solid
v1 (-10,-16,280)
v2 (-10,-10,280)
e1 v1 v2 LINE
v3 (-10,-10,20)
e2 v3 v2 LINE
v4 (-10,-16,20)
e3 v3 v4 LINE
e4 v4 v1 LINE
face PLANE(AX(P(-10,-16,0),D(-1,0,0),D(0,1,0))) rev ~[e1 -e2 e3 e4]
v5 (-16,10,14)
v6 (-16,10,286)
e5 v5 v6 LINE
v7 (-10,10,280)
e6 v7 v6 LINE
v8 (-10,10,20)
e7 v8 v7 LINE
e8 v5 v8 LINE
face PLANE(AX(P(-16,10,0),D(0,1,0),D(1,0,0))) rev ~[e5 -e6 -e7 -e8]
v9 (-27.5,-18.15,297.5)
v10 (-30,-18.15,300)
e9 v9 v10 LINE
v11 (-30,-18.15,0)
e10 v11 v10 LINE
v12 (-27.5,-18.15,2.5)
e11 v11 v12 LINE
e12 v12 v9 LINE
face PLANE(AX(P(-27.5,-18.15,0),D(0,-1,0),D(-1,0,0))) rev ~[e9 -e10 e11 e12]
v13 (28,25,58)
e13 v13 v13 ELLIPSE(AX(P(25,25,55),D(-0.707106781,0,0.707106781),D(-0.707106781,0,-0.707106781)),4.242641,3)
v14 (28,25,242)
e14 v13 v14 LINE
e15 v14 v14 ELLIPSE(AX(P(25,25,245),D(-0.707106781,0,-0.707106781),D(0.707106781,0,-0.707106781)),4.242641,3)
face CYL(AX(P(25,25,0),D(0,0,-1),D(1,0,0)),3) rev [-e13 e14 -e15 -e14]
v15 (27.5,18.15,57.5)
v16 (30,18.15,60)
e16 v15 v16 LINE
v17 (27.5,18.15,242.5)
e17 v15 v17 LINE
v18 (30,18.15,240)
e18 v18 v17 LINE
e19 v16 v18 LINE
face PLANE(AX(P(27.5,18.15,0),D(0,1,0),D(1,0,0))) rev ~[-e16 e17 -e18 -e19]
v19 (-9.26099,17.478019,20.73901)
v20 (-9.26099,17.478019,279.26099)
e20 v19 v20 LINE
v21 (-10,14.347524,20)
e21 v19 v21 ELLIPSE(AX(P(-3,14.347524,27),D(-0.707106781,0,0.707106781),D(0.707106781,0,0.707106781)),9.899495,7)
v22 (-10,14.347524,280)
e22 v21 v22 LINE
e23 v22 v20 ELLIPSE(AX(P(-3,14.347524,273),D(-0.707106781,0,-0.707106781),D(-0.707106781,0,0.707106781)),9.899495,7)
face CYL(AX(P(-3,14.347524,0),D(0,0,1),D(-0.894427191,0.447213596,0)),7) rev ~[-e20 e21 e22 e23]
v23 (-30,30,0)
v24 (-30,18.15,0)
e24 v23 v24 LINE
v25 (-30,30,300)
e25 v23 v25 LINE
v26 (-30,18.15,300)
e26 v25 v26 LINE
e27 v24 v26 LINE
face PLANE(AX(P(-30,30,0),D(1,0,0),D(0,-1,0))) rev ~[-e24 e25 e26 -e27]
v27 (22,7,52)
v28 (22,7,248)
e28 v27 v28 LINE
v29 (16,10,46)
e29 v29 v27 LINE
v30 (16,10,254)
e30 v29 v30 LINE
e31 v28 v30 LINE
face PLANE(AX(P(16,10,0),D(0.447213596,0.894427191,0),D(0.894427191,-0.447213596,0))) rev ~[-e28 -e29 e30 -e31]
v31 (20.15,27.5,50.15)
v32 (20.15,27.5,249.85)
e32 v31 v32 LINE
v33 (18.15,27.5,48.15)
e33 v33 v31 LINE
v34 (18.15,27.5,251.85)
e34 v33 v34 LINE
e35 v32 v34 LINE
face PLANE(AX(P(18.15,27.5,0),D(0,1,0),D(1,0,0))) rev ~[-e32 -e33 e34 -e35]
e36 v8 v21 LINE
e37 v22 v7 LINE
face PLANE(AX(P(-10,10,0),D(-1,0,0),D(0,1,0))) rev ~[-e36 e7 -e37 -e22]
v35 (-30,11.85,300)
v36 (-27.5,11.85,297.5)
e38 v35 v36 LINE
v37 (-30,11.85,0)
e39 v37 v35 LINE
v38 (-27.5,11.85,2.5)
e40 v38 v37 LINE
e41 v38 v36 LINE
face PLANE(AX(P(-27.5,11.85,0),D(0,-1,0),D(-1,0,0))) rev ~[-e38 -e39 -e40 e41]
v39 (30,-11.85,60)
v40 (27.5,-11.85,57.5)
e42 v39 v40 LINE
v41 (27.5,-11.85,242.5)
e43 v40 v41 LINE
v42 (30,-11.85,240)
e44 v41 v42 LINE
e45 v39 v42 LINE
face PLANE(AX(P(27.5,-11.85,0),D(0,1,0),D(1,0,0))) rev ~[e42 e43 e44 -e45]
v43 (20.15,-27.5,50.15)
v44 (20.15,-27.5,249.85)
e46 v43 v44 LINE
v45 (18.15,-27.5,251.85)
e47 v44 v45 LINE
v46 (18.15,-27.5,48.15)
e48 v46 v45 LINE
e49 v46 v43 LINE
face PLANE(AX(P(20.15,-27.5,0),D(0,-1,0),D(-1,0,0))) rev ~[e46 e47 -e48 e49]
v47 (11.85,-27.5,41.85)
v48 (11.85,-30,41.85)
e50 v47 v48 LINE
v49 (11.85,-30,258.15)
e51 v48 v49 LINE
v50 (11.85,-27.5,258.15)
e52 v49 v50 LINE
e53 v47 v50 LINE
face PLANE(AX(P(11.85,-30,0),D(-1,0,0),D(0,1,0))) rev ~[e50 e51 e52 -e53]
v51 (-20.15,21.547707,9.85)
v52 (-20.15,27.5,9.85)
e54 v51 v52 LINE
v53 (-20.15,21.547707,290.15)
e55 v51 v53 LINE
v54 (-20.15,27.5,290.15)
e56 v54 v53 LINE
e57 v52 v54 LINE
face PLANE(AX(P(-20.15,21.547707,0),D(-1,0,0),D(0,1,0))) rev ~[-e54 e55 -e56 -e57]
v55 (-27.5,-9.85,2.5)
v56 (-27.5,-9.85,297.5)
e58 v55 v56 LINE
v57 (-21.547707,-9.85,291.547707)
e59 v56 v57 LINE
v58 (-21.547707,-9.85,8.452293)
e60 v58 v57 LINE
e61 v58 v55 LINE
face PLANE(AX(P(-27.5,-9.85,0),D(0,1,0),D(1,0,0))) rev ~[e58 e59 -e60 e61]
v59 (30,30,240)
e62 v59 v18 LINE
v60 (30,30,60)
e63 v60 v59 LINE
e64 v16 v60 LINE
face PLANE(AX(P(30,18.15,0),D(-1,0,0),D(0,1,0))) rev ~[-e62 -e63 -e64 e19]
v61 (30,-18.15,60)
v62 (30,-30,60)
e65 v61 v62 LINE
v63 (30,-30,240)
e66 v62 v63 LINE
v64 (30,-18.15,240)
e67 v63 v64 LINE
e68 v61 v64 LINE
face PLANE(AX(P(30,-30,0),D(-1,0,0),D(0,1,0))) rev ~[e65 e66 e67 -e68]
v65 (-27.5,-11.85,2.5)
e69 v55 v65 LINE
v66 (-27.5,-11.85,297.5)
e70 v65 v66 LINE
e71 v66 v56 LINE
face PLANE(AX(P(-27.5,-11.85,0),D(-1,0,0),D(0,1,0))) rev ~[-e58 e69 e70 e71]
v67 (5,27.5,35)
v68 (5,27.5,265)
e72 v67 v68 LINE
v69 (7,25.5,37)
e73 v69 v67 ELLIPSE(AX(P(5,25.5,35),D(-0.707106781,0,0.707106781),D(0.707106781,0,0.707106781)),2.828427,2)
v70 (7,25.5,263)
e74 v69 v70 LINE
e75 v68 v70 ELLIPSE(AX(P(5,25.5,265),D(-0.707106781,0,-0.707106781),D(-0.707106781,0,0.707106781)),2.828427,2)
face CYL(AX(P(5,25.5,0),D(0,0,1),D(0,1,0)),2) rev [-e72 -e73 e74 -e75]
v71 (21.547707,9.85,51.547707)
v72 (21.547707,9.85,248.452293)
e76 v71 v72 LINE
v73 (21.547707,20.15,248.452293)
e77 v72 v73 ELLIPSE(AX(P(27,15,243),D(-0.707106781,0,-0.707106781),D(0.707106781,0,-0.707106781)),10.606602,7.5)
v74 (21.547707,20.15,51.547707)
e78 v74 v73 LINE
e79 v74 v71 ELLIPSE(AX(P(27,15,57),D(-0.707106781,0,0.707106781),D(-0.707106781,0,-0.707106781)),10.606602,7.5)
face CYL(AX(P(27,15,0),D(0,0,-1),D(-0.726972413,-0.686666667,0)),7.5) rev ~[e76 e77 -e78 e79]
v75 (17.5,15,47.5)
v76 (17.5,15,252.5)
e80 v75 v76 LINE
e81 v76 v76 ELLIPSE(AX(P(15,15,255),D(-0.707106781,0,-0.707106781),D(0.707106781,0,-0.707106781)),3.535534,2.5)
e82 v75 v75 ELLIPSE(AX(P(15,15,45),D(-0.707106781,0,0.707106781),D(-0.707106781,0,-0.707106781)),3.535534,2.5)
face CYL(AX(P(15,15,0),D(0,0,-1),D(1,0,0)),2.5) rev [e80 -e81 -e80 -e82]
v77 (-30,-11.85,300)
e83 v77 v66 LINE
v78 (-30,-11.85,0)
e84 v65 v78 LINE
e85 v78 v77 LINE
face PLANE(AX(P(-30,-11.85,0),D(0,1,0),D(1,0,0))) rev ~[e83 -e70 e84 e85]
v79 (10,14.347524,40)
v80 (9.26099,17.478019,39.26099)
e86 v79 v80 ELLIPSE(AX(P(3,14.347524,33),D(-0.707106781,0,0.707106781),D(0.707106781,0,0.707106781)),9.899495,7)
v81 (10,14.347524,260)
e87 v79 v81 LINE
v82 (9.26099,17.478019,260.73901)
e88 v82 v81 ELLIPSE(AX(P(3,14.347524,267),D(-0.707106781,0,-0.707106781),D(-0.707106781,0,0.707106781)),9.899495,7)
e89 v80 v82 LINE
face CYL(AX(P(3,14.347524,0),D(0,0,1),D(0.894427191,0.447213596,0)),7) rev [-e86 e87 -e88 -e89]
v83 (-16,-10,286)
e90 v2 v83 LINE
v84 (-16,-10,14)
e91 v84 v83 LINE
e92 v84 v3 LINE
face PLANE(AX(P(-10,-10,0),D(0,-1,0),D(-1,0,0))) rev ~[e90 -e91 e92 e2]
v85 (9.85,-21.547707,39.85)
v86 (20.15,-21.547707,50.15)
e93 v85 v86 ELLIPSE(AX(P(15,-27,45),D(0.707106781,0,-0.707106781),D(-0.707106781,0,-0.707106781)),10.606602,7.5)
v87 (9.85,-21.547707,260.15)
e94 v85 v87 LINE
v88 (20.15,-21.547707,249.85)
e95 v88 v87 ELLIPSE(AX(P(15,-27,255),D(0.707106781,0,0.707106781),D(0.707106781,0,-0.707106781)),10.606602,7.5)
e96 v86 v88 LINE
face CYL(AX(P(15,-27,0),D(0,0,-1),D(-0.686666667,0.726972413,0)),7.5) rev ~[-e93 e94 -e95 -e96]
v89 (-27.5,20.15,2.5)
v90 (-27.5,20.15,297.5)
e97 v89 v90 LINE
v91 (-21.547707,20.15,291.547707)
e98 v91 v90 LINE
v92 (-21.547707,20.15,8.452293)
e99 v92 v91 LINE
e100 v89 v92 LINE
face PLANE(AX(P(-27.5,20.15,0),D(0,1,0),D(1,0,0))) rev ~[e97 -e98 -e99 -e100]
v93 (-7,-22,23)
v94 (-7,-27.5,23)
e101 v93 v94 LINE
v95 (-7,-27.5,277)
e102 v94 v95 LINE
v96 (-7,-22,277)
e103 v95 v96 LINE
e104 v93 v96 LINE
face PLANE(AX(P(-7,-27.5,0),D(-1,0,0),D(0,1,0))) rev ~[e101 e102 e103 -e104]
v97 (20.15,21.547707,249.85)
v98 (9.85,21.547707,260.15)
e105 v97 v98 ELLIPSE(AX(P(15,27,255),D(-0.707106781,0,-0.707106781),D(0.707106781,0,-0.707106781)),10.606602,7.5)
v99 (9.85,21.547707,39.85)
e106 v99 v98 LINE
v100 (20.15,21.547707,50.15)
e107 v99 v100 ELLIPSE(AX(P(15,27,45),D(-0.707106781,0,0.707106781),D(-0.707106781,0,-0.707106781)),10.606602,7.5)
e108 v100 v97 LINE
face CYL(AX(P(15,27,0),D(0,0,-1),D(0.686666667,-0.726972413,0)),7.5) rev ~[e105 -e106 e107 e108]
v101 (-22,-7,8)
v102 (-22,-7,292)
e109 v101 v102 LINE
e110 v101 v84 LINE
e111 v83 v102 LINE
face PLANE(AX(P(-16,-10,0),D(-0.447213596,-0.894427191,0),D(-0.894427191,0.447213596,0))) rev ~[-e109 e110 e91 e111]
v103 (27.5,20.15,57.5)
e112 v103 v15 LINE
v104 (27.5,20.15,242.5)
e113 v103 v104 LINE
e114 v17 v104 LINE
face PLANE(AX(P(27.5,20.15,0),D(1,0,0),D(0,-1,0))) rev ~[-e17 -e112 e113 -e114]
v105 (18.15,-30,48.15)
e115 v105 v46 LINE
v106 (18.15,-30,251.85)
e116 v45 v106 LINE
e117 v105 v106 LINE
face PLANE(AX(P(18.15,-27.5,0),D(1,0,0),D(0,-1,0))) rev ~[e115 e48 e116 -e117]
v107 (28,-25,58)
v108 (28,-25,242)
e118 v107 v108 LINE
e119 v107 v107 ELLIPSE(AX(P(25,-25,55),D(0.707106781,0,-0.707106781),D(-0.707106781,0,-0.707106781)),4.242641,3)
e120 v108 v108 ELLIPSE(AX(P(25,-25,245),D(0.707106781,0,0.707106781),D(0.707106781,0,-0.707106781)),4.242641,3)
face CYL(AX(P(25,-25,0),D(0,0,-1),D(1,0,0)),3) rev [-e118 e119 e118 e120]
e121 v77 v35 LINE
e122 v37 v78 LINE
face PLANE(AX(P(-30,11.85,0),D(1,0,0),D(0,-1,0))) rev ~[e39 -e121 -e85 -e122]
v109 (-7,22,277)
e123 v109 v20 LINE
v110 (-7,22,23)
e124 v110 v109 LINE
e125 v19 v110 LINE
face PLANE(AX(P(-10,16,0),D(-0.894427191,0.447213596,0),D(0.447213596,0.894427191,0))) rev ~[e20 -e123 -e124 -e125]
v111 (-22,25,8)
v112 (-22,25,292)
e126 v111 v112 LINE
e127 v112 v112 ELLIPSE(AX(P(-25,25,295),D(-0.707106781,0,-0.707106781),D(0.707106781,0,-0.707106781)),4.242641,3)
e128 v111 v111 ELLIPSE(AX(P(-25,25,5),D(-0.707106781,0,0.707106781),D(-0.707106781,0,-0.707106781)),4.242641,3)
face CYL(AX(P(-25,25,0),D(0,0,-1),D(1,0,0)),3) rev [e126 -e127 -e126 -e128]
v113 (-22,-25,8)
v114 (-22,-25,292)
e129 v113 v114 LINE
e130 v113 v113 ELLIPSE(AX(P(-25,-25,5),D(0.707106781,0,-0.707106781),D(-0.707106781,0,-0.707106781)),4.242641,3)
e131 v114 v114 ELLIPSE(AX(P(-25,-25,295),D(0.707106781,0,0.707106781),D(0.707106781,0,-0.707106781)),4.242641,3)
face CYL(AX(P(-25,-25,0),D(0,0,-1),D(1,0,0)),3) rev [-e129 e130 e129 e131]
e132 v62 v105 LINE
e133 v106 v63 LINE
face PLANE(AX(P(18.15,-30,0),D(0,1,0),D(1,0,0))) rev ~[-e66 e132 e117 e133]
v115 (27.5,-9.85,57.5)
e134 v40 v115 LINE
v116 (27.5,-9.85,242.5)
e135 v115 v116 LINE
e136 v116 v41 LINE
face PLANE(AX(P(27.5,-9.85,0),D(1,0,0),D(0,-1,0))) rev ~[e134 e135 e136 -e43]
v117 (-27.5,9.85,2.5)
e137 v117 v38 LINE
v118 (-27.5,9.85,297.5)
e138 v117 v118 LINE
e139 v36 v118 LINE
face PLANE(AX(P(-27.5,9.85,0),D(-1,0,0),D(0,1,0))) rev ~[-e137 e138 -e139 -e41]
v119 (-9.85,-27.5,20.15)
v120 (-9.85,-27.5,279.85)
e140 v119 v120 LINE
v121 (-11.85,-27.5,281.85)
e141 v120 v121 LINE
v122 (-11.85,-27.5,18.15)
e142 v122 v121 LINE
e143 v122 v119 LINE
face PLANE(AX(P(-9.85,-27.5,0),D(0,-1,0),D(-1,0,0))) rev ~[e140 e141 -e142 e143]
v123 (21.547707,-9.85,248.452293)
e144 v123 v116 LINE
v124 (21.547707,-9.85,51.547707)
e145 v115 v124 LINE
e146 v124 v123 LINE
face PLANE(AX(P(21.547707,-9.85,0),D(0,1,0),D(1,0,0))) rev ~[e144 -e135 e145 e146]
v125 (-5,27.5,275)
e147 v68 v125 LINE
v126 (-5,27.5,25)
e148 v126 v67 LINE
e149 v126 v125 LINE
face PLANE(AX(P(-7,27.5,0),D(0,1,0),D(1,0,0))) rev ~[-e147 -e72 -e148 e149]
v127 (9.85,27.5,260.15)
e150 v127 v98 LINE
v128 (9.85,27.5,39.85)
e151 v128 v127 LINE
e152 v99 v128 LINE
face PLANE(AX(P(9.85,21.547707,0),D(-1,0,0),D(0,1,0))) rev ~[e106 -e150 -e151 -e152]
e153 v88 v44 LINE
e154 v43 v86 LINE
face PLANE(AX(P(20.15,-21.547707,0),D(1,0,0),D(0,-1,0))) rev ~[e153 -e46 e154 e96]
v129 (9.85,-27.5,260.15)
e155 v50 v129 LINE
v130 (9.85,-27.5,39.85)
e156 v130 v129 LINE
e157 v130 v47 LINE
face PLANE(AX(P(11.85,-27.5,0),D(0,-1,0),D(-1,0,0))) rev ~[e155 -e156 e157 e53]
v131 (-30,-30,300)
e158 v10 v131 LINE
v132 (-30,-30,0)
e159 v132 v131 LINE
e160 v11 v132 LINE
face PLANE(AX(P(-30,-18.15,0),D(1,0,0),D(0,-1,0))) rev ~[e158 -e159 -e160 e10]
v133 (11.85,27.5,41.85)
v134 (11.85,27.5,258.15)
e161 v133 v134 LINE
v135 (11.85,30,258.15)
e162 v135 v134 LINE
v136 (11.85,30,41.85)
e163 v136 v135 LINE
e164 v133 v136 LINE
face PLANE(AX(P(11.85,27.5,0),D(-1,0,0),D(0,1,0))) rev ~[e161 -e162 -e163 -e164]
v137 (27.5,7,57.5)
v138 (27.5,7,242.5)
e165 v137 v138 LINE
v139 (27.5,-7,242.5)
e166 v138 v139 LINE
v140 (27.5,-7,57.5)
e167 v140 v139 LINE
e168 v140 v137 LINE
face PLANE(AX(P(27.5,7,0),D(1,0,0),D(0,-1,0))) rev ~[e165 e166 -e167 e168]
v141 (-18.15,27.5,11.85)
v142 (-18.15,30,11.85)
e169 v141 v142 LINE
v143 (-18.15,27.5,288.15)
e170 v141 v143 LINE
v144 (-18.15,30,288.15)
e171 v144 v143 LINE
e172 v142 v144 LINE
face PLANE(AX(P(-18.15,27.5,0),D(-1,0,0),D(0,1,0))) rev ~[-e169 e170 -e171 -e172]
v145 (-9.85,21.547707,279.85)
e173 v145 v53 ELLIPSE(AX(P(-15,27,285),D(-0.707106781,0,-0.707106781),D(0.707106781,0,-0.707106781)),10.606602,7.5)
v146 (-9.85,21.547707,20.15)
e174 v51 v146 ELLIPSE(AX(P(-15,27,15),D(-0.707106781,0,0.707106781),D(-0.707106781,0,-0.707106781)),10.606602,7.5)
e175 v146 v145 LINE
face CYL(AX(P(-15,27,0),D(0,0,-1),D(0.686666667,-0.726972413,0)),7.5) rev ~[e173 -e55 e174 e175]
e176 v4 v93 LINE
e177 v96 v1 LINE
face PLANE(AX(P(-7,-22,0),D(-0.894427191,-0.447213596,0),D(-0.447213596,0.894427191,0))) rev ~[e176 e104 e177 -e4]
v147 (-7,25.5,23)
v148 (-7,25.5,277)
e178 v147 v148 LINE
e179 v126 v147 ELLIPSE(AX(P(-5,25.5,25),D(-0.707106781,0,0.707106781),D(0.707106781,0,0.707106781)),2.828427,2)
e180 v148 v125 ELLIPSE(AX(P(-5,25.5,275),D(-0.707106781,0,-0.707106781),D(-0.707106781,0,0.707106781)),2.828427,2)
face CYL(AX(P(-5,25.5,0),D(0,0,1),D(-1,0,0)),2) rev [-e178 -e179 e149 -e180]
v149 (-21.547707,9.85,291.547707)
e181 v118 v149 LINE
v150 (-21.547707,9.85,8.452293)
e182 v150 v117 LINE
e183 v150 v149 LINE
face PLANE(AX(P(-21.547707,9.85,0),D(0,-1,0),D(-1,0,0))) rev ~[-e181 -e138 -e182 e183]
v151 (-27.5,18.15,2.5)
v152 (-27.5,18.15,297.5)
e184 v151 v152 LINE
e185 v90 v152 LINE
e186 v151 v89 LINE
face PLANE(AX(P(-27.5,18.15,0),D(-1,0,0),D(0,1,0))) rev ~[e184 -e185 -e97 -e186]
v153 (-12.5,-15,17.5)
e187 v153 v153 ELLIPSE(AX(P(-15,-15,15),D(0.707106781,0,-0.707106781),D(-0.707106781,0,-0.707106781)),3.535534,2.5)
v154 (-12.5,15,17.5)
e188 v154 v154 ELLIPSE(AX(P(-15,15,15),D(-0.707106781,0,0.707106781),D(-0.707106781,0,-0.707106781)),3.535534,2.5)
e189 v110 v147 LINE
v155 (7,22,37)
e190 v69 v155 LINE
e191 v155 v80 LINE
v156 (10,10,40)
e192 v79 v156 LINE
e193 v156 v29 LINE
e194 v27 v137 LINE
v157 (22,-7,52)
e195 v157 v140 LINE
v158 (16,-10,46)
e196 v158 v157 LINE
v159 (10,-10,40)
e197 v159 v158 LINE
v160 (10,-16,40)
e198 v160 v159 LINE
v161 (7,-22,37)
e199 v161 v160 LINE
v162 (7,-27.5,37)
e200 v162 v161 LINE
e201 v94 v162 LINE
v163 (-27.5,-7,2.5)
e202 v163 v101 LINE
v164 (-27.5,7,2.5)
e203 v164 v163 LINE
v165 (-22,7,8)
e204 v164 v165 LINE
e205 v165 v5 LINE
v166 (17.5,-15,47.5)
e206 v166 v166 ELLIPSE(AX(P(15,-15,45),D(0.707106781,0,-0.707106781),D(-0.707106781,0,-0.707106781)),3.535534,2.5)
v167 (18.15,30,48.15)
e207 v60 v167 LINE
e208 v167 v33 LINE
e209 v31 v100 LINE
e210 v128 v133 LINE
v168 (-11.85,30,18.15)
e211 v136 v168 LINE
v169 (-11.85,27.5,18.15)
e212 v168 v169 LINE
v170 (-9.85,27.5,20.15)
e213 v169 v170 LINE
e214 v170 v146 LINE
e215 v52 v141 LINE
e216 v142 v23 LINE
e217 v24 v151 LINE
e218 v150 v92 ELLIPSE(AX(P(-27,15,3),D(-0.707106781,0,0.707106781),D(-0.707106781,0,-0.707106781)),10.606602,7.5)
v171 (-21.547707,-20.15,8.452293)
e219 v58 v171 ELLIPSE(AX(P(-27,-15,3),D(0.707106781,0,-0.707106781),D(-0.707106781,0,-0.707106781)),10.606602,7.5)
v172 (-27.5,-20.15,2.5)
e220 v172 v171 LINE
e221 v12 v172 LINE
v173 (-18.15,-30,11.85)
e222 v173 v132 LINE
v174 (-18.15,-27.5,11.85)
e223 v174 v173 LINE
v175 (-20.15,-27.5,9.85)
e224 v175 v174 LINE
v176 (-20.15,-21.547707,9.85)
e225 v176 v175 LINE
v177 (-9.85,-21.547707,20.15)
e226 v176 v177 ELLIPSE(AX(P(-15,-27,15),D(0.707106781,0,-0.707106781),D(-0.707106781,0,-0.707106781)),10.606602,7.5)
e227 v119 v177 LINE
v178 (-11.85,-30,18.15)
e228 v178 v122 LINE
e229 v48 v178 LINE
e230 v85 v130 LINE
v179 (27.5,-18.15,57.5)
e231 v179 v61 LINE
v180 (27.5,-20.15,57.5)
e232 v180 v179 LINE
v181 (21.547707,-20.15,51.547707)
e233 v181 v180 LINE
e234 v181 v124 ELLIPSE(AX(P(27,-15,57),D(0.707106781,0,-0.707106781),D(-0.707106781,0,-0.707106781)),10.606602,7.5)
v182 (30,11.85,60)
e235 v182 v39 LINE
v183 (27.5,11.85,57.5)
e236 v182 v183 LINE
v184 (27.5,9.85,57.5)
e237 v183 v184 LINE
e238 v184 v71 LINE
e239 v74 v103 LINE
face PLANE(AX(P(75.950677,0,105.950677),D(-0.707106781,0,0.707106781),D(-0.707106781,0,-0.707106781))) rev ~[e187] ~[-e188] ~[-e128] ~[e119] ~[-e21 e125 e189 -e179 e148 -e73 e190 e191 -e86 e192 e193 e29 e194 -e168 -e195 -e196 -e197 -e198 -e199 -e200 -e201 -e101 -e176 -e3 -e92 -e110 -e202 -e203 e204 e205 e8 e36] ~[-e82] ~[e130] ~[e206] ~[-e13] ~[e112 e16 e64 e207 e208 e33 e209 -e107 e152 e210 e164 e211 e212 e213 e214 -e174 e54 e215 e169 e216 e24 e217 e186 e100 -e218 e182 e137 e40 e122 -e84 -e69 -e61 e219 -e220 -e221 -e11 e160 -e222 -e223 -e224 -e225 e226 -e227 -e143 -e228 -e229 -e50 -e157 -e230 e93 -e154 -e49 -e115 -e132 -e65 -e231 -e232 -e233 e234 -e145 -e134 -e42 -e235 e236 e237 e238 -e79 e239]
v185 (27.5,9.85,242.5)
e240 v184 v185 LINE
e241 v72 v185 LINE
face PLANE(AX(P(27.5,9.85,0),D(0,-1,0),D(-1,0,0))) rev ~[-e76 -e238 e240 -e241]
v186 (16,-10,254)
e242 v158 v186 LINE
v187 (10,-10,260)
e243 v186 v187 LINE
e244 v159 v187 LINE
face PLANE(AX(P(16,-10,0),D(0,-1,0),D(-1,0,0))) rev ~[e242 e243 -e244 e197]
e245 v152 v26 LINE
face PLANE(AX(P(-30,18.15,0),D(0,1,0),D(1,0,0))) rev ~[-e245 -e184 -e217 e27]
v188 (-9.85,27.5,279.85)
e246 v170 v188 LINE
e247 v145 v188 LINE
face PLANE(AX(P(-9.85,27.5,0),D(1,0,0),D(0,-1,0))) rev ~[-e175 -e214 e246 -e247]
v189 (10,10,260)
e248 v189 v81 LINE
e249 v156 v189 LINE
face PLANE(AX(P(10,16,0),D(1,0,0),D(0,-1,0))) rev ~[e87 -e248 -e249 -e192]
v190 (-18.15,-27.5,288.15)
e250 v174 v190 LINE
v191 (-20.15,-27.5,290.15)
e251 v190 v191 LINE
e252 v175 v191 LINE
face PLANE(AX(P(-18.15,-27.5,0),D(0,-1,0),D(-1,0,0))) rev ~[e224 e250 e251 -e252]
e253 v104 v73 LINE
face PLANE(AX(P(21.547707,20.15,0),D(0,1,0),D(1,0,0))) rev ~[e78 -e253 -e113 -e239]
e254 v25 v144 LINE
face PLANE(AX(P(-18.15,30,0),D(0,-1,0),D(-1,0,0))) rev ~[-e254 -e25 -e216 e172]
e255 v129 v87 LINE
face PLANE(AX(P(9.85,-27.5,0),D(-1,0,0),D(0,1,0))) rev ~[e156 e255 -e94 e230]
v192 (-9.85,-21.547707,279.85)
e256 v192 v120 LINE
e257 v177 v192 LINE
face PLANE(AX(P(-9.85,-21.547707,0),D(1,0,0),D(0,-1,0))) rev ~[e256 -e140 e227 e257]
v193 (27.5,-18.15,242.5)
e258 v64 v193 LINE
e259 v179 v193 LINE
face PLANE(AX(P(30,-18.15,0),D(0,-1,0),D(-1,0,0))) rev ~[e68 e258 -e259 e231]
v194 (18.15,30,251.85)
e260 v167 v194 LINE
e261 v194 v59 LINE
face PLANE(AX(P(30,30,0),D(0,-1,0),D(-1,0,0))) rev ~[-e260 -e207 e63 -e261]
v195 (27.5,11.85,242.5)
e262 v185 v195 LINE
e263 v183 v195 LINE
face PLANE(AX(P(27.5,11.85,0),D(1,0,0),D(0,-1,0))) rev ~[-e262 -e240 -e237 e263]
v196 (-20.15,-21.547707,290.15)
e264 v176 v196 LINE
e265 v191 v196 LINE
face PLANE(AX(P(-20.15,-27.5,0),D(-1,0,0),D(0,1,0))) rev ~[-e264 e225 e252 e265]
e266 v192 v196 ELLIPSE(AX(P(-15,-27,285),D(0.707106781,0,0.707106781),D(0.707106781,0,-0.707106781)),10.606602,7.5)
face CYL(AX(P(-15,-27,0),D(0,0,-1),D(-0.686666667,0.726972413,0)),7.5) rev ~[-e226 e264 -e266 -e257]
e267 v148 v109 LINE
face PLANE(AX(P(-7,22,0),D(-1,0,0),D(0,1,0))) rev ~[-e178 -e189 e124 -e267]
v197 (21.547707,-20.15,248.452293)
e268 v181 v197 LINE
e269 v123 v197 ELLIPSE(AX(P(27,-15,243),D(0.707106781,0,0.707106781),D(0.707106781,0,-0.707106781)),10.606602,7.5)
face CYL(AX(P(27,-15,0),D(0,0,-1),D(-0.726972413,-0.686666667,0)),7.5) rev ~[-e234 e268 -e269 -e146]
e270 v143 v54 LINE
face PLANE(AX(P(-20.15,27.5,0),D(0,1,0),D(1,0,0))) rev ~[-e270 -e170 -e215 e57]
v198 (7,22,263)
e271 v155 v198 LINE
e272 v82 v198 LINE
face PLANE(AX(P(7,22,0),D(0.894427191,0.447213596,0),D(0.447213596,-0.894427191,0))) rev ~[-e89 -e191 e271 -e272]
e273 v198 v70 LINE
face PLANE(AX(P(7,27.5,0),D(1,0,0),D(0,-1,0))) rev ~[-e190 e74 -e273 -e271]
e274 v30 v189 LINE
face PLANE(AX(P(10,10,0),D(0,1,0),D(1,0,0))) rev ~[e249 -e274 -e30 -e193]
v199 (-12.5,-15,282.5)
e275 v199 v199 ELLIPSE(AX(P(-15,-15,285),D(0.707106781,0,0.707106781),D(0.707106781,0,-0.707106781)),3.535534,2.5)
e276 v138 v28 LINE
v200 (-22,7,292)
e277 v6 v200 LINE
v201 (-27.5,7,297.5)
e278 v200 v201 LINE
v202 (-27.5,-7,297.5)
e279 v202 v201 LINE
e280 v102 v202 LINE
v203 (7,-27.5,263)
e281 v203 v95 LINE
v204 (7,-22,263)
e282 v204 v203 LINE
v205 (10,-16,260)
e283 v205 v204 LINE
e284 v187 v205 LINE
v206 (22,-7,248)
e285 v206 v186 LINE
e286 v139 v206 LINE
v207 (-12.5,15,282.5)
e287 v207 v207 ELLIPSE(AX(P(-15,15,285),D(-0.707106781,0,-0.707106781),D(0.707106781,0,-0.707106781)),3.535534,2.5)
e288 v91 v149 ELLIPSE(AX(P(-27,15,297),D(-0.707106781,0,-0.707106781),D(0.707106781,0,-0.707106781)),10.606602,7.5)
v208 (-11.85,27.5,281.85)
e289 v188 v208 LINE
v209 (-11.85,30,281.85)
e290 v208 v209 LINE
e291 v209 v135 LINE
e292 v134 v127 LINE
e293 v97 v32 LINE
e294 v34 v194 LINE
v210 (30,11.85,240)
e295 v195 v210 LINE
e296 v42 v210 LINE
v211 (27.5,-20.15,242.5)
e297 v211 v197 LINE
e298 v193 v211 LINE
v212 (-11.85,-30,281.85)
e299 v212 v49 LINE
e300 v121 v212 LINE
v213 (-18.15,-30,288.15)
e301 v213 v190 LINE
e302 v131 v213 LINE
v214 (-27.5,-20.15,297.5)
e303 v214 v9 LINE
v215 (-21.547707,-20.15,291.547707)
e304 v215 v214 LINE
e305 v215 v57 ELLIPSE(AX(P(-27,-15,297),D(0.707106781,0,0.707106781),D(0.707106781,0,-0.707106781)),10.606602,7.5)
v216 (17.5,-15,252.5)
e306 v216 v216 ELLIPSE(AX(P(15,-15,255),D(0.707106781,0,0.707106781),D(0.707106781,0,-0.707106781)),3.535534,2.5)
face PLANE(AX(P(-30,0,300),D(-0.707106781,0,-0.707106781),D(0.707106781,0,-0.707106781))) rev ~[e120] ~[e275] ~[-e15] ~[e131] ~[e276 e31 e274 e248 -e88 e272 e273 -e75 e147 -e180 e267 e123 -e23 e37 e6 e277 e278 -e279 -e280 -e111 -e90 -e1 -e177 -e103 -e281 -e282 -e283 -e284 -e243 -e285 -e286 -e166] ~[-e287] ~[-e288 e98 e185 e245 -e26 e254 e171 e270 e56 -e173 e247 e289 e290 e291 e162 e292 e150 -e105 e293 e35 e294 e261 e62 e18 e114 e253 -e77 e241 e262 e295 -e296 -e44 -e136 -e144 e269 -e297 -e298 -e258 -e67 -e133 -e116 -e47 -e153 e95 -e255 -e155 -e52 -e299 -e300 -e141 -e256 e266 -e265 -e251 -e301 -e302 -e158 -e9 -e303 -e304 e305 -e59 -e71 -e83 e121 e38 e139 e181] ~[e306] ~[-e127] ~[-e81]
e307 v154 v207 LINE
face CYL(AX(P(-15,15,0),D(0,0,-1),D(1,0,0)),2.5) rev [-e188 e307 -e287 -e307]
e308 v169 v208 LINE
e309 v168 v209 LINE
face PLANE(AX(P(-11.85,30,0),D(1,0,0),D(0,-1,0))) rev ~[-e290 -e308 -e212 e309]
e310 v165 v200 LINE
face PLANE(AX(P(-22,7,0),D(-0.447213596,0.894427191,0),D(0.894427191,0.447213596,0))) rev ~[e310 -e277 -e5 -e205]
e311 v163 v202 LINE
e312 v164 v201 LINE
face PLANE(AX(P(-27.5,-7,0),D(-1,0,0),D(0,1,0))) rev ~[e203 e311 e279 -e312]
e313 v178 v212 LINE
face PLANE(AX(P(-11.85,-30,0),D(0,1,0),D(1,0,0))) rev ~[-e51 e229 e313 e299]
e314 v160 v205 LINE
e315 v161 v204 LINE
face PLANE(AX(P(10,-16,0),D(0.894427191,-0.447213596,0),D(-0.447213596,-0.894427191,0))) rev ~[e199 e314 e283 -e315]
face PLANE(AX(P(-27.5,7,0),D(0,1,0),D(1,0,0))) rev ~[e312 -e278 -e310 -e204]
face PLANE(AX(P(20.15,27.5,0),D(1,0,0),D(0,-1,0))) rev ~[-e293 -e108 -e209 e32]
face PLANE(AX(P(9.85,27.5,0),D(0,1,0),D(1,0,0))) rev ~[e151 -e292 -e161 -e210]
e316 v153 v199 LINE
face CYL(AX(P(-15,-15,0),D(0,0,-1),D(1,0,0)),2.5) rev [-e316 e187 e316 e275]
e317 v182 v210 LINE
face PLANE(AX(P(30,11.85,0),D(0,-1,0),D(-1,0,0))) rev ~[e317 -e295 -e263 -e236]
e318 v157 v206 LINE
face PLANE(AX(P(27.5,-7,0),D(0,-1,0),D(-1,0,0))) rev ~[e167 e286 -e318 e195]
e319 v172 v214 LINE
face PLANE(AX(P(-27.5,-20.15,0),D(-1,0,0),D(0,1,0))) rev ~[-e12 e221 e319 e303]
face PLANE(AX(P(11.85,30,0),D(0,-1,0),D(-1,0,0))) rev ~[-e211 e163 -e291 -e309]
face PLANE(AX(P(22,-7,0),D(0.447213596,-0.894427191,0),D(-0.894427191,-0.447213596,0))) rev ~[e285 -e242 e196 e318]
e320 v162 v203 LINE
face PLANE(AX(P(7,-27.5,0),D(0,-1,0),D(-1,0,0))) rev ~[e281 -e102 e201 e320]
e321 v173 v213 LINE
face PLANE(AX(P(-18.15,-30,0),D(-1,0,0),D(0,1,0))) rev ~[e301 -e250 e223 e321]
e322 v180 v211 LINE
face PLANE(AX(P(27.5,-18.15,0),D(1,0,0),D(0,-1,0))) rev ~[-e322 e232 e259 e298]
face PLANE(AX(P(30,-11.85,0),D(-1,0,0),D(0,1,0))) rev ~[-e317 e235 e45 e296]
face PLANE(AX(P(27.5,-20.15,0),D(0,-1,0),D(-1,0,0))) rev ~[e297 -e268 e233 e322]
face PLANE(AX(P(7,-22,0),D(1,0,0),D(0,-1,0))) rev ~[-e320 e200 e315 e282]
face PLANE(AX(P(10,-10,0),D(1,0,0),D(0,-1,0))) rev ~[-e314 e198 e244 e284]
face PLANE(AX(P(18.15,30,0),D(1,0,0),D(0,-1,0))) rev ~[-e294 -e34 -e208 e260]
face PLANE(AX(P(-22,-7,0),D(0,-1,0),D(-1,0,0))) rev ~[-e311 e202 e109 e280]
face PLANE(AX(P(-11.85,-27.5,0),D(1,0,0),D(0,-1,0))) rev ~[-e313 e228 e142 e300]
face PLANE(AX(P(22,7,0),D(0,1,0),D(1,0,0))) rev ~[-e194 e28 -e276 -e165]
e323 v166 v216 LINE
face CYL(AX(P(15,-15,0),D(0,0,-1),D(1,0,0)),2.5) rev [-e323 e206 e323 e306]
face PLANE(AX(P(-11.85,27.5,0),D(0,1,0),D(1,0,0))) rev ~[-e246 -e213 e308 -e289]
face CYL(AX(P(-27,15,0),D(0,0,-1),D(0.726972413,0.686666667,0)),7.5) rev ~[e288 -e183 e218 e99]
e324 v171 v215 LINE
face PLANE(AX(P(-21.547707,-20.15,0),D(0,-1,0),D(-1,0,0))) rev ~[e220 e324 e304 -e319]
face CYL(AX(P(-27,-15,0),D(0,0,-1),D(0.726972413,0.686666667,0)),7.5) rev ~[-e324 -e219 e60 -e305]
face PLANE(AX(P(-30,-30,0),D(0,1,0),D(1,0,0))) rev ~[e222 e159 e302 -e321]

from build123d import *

# Parameters (mm, degrees)
F0_R          = 3
F0_R_2        = 2.5
F1_DEPTH      = 300
F2_R          = 2
F3_R          = 7
F6_DEPTH      = 30
F6_DEPTH_BACK = 30


# Not quite as in the source:
# - a feature names something its author has since deleted; it is built from what else it names


with BuildPart() as f1:
    # F0 (on Top) → F1 (new body)
    with BuildSketch(Plane.XY):
        with BuildLine():
            Line((18.15, -30), (30, -30))
            Line((30, -30), (30, -18.15))
            Line((30, -18.15), (27.5, -18.15))
            Line((27.5, -18.15), (27.5, -20.15))
            Line((27.5, -20.15), (21.5477069044, -20.15))
            ThreePointArc((21.5477069044, -20.15), (19.5, -15), (21.5477069044, -9.85))
            Line((21.5477069044, -9.85), (27.5, -9.85))
            Line((27.5, -9.85), (27.5, -11.85))
            Line((27.5, -11.85), (30, -11.85))
            Line((30, -11.85), (30, 11.85))
            Line((30, 11.85), (27.5, 11.85))
            Line((27.5, 11.85), (27.5, 9.85))
            Line((27.5, 9.85), (21.5477069044, 9.85))
            ThreePointArc((21.5477069044, 9.85), (19.5, 15), (21.5477069044, 20.15))
            Line((21.5477069044, 20.15), (27.5, 20.15))
            Line((27.5, 20.15), (27.5, 18.15))
            Line((27.5, 18.15), (30, 18.15))
            Line((30, 18.15), (30, 30))
            Line((30, 30), (18.15, 30))
            Line((18.15, 30), (18.15, 27.5))
            Line((18.15, 27.5), (20.15, 27.5))
            Line((20.15, 27.5), (20.15, 21.5477069044))
            ThreePointArc((20.15, 21.5477069044), (15, 19.5), (9.85, 21.5477069044))
            Line((9.85, 21.5477069044), (9.85, 27.5))
            Line((9.85, 27.5), (11.85, 27.5))
            Line((11.85, 27.5), (11.85, 30))
            Line((11.85, 30), (-11.85, 30))
            Line((-11.85, 30), (-11.85, 27.5))
            Line((-11.85, 27.5), (-9.85, 27.5))
            Line((-9.85, 27.5), (-9.85, 21.5477069044))
            ThreePointArc((-9.85, 21.5477069044), (-15, 19.5), (-20.15, 21.5477069044))
            Line((-20.15, 21.5477069044), (-20.15, 27.5))
            Line((-20.15, 27.5), (-18.15, 27.5))
            Line((-18.15, 27.5), (-18.15, 30))
            Line((-18.15, 30), (-30, 30))
            Line((-30, 30), (-30, 18.15))
            Line((-30, 18.15), (-27.5, 18.15))
            Line((-27.5, 18.15), (-27.5, 20.15))
            Line((-27.5, 20.15), (-21.5477069044, 20.15))
            ThreePointArc((-21.5477069044, 20.15), (-19.5, 15), (-21.5477069044, 9.85))
            Line((-21.5477069044, 9.85), (-27.5, 9.85))
            Line((-27.5, 9.85), (-27.5, 11.85))
            Line((-27.5, 11.85), (-30, 11.85))
            Line((-30, 11.85), (-30, -11.85))
            Line((-30, -11.85), (-27.5, -11.85))
            Line((-27.5, -11.85), (-27.5, -9.85))
            Line((-27.5, -9.85), (-21.5477069044, -9.85))
            ThreePointArc((-21.5477069044, -9.85), (-19.5, -15), (-21.5477069044, -20.15))
            Line((-21.5477069044, -20.15), (-27.5, -20.15))
            Line((-27.5, -20.15), (-27.5, -18.15))
            Line((-27.5, -18.15), (-30, -18.15))
            Line((-30, -18.15), (-30, -30))
            Line((-30, -30), (-18.15, -30))
            Line((-18.15, -30), (-18.15, -27.5))
            Line((-18.15, -27.5), (-20.15, -27.5))
            Line((-20.15, -27.5), (-20.15, -21.5477069044))
            ThreePointArc((-20.15, -21.5477069044), (-15, -19.5), (-9.85, -21.5477069044))
            Line((-9.85, -21.5477069044), (-9.85, -27.5))
            Line((-9.85, -27.5), (-11.85, -27.5))
            Line((-11.85, -27.5), (-11.85, -30))
            Line((-11.85, -30), (11.85, -30))
            Line((11.85, -30), (11.85, -27.5))
            Line((11.85, -27.5), (9.85, -27.5))
            Line((9.85, -27.5), (9.85, -21.5477069044))
            ThreePointArc((9.85, -21.5477069044), (15, -19.5), (20.15, -21.5477069044))
            Line((20.15, -21.5477069044), (20.15, -27.5))
            Line((20.15, -27.5), (18.15, -27.5))
            Line((18.15, -27.5), (18.15, -30))
        make_face()
        with Locations((-25, -25)):
            Circle(F0_R, mode=Mode.SUBTRACT)
        with Locations((-15, -15)):
            Circle(F0_R_2, mode=Mode.SUBTRACT)
        with Locations((25, -25)):
            Circle(F0_R, mode=Mode.SUBTRACT)
        with Locations((15, -15)):
            Circle(F0_R_2, mode=Mode.SUBTRACT)
        with Locations((-25, 25)):
            Circle(F0_R, mode=Mode.SUBTRACT)
        with Locations((-15, 15)):
            Circle(F0_R_2, mode=Mode.SUBTRACT)
        Polygon((-7, 22), (-7, 27.5), (0, 27.5), (7, 27.5), (7, 22), (10, 16), (10, 10), (16, 10), (22, 7), (27.5, 7), (27.5, 0), (27.5, -7), (22, -7), (16, -10), (10, -10), (10, -16), (7, -22), (7, -27.5), (0, -27.5), (-7, -27.5), (-7, -22), (-10, -16), (-10, -10), (-16, -10), (-22, -7), (-27.5, -7), (-27.5, 0), (-27.5, 7), (-22, 7), (-16, 10), (-10, 10), (-10, 16), align=None, mode=Mode.SUBTRACT)
        with Locations((15, 15)):
            Circle(F0_R_2, mode=Mode.SUBTRACT)
        with Locations((25, 25)):
            Circle(F0_R, mode=Mode.SUBTRACT)
    extrude(amount=F1_DEPTH)

    # F2
    f2_edges = [f1.edges().sort_by_distance(p)[0] for p in [
        (-7, 27.5, 150),
        (7, 27.5, 150),
    ]]
    fillet(f2_edges, radius=F2_R)

    # F3
    f3_edges = [f1.edges().sort_by_distance(p)[0] for p in [
        (-10, 16, 150),
        (10, 16, 150),
    ]]
    fillet(f3_edges, radius=F3_R)

    # F5 (on Front) → F6 (cut, two sides)
    with BuildSketch(Plane.XZ) as f6_sk:
        Polygon((144.6894081855, 37.2119464586), (75.9506773221, 105.9506773221), (-30, 0), (38.7387308634, -68.7387308634), align=None)
        Polygon((81.6358354247, 188.3641645753), (150.3745847274, 257.102913878), (38.7387493027, 368.7387493027), (-30, 300), align=None)
    extrude(amount=F6_DEPTH, mode=Mode.SUBTRACT)
    extrude(f6_sk.sketch, amount=-F6_DEPTH_BACK, mode=Mode.SUBTRACT)


solid = f1.part
